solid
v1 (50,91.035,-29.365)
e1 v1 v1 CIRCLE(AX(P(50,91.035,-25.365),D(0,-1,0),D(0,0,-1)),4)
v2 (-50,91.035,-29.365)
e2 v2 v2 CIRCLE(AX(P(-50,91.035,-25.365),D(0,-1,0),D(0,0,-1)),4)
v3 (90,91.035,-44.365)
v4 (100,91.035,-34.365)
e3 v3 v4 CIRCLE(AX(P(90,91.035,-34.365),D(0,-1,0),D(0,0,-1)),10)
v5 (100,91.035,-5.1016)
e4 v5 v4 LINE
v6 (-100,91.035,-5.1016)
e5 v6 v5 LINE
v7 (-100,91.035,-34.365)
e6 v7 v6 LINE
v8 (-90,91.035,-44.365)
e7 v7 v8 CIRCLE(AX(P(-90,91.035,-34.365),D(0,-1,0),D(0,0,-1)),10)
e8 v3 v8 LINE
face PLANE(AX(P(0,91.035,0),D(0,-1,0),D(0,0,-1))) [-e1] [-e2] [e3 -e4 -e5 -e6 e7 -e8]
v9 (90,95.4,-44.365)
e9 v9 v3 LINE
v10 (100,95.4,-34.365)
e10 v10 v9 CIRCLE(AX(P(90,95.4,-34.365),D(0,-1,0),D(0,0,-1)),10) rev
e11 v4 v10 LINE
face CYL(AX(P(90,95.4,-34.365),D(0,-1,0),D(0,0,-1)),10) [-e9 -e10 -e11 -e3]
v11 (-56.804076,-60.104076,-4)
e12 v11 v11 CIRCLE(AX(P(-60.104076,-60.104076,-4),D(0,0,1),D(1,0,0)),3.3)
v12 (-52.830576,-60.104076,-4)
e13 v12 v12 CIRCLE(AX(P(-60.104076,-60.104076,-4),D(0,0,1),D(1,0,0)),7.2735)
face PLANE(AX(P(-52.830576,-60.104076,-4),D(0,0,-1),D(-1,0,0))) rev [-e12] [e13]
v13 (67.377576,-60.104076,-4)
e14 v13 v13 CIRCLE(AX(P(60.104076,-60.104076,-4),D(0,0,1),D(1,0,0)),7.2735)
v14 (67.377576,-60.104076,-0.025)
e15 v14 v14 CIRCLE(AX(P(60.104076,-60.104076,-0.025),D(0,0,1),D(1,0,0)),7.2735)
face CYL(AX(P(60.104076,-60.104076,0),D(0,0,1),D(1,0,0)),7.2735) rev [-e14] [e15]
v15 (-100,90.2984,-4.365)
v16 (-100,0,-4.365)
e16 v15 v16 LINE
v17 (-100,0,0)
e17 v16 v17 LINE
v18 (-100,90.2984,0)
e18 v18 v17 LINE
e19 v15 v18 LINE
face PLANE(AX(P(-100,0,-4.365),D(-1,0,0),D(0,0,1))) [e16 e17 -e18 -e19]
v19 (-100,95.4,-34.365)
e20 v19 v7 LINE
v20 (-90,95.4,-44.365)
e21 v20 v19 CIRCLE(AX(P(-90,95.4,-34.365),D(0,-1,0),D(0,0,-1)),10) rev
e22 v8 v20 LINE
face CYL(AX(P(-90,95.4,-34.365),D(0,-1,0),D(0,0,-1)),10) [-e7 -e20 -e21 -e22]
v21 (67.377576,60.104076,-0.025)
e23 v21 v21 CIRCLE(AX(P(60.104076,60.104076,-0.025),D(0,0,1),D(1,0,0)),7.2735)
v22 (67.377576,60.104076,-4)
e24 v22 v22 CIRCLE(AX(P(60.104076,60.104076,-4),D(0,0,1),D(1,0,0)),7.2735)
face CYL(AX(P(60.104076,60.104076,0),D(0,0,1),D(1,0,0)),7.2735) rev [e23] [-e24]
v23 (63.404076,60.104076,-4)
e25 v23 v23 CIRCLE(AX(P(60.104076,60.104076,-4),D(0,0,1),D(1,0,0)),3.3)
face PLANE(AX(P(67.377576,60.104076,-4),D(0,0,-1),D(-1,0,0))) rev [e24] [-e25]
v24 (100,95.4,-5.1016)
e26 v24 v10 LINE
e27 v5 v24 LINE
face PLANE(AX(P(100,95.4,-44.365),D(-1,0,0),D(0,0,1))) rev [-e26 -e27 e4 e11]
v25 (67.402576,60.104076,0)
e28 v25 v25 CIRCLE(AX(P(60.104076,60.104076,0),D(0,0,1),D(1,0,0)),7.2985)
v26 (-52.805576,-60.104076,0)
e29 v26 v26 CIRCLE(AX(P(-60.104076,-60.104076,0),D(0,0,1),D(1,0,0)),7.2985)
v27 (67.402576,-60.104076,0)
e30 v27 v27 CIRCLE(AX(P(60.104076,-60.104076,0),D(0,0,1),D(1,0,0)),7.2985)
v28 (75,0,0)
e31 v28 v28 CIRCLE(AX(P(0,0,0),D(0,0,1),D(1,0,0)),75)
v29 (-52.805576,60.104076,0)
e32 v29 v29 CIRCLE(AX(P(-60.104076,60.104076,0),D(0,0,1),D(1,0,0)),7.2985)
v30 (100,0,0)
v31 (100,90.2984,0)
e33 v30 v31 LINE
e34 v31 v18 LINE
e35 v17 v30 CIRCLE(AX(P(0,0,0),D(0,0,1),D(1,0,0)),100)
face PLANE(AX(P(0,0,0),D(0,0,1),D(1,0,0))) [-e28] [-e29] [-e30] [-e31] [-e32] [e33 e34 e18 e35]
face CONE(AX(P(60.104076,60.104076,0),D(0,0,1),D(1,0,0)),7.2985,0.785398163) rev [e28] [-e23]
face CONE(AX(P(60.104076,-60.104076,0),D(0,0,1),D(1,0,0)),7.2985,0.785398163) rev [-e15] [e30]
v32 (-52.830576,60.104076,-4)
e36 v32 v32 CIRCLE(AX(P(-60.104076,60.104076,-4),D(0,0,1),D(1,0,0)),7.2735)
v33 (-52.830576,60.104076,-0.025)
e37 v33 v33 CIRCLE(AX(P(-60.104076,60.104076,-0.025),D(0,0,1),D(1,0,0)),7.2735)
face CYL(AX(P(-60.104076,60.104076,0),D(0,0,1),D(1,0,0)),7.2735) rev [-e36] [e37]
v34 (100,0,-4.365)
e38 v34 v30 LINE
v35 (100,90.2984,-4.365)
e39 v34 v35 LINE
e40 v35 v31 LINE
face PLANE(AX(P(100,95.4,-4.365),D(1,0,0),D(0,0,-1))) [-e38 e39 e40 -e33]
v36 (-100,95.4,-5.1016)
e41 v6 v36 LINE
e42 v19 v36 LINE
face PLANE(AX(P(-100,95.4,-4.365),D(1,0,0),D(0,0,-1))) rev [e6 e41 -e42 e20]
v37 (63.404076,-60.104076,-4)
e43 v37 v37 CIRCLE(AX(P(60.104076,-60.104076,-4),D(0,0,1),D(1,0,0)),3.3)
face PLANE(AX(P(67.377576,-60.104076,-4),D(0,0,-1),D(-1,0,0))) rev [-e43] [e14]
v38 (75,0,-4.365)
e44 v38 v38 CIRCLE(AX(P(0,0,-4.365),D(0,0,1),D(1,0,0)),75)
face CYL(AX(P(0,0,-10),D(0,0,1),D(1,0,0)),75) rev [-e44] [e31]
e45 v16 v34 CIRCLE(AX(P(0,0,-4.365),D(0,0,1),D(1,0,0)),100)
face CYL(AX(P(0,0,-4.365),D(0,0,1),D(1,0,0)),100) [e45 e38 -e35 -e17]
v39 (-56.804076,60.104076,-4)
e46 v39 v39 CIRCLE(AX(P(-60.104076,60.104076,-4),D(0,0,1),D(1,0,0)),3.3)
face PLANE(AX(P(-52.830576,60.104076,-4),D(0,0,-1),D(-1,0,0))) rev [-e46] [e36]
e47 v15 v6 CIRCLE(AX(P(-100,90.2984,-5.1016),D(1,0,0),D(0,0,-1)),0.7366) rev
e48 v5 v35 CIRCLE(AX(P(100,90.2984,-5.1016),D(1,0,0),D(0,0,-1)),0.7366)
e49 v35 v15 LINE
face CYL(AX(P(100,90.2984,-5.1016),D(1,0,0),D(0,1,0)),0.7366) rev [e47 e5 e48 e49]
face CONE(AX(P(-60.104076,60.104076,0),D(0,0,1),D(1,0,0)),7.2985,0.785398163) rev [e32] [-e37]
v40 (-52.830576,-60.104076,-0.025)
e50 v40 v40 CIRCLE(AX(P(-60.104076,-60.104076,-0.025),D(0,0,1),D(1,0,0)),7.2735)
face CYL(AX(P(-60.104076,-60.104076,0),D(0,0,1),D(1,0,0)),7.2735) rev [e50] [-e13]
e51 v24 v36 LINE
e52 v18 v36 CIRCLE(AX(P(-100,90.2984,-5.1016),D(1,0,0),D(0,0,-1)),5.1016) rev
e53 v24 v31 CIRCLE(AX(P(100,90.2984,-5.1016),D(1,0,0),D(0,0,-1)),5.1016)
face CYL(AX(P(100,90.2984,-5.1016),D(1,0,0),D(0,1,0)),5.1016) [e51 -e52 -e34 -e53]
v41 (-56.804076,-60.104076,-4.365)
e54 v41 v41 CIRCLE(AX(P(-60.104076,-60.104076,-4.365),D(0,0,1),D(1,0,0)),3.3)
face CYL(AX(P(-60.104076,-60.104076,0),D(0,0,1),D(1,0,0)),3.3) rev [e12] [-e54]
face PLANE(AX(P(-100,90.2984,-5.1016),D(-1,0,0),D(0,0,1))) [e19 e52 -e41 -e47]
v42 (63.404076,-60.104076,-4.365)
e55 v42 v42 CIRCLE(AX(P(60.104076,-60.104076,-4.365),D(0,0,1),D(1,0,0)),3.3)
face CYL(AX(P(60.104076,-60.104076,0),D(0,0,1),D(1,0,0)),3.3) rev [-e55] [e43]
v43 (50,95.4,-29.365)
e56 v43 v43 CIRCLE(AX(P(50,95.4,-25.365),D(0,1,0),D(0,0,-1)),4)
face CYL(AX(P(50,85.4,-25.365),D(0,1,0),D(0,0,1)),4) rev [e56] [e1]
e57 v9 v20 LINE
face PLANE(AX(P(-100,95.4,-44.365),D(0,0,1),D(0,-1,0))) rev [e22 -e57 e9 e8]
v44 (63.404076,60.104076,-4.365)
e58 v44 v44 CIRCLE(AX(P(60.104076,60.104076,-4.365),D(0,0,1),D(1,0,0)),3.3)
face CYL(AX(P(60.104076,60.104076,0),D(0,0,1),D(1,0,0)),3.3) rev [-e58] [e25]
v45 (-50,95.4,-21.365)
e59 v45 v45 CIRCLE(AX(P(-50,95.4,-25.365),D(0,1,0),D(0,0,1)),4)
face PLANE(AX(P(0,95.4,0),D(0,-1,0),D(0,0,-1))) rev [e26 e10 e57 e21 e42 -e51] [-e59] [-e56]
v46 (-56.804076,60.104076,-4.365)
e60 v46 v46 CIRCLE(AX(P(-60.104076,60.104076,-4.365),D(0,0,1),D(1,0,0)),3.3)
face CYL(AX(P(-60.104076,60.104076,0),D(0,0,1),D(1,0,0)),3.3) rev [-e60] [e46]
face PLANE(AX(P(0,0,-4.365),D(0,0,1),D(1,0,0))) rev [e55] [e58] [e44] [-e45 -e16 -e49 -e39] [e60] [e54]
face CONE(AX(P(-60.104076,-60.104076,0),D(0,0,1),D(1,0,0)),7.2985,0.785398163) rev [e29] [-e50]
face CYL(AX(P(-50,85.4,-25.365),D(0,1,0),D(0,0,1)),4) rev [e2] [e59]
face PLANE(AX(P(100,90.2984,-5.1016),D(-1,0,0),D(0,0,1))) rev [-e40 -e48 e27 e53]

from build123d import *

# Parameters (mm, degrees)
BASE_FLANGE1_DEPTH           = 4.365
EDGE_FLANGE1_STRIP_W         = 18.9332
EDGE_FLANGE1_STRIP_H         = 4.365
EDGE_FLANGE1_STRIP_CUT_DEPTH = 200
EDGE_FLANGE1_DEPTH           = 200
SKETCH10_R                   = 75
CUT_EXTRUDE1_DEPTH           = 10
FILLET1_R                    = 10
SKETCH12_R                   = 4
CUT_EXTRUDE3_DEPTH           = 10
CIRPATTERN1_COUNT            = 4


# Sheet-metal steps are written as plain solids
with BuildPart() as part:
    # Sketch2 → Base-Flange1 (new body)
    with BuildSketch(Plane.XY):
        with BuildLine():
            Line((-100, 0), (-100, 95.4))
            Line((-100, 95.4), (100, 95.4))
            Line((100, 95.4), (100, 0))
            ThreePointArc((100, 0), (0, -100), (-100, 0))
        make_face()
    extrude(amount=-BASE_FLANGE1_DEPTH)

    # Edge-Flange1 strip (across the edge) → Edge-Flange1 strip cut (cut)
    with BuildSketch(Plane(origin=(-100, 95.4, -4.365), x_dir=(0, -1, 0), z_dir=(1, 0, 0))):
        with Locations((-4.365, -2.1825)):
            Rectangle(EDGE_FLANGE1_STRIP_W, EDGE_FLANGE1_STRIP_H)
    extrude(amount=EDGE_FLANGE1_STRIP_CUT_DEPTH, mode=Mode.SUBTRACT)

    # Edge-Flange1 section (across the edge) → Edge-Flange1 (add)
    with BuildSketch(Plane(origin=(-100, 95.4, -4.365), x_dir=(0, -1, 0), z_dir=(1, 0, 0))):
        with BuildLine():
            Line((0, 0.7366), (0, 40))
            Line((0, 40), (4.365, 40))
            Line((4.365, 40), (4.365, 0.7366))
            ThreePointArc((4.365, 0.7366), (4.580745145, 0.215745145), (5.1016, 0))
            Line((5.1016, 0), (5.1016, -4.365))
            ThreePointArc((5.1016, -4.365), (1.494224045, -2.870775955), (0, 0.7366))
        make_face()
    extrude(amount=EDGE_FLANGE1_DEPTH)

    # Sketch10 → Cut-Extrude1 (cut)
    with BuildSketch(Plane.XY):
        Circle(SKETCH10_R)
    extrude(amount=-CUT_EXTRUDE1_DEPTH, mode=Mode.SUBTRACT)

    # Fillet1
    fillet1_edges = [part.edges().sort_by_distance(p)[0] for p in [
        (-100, 93.2175, -44.365),
        (100, 93.2175, -44.365),
    ]]
    fillet(fillet1_edges, radius=FILLET1_R)

    # Sketch12 → Cut-Extrude3 (cut)
    with BuildSketch(Plane(origin=(0, 95.4, 0), x_dir=(1, 0, 0), z_dir=(0, 1, 0))):
        with Locations(Location((-50, 25.365, 0), (0, 0, 270))):
            Circle(SKETCH12_R)
        with Locations(Location((50, 25.365, 0), (0, 0, 90))):
            Circle(SKETCH12_R)
    extrude(amount=-CUT_EXTRUDE3_DEPTH, mode=Mode.SUBTRACT)

    # Sketch14 → CBORE for M6 Hex Head Screw1 (revolve, cut)
    with BuildSketch(Plane(origin=(-60.104076401, 60.104076401, 0), x_dir=(0, -1, 0), z_dir=(1, 0, 0))):
        Polygon((0, 0), (0, 44.365), (3.3, 44.365), (3.3, 4), (7.2735, 4), (7.2735, 0.025), (7.2985, 0), align=None)
    cbore_for_m6_hex_head_screw1 = revolve(axis=Axis((-60.104076401, 60.104076401, 6.35), (0, 0, -1)), mode=Mode.SUBTRACT)

    # CirPattern1: CBORE for M6 Hex Head Screw1 ×4 about axis
    cirpattern1_axis = Axis((0, 0, 0), (0, 0, 1))
    for i in range(1, CIRPATTERN1_COUNT):
        add(cbore_for_m6_hex_head_screw1.rotate(cirpattern1_axis, i * 360 / CIRPATTERN1_COUNT), mode=Mode.SUBTRACT)


solid = part.part
